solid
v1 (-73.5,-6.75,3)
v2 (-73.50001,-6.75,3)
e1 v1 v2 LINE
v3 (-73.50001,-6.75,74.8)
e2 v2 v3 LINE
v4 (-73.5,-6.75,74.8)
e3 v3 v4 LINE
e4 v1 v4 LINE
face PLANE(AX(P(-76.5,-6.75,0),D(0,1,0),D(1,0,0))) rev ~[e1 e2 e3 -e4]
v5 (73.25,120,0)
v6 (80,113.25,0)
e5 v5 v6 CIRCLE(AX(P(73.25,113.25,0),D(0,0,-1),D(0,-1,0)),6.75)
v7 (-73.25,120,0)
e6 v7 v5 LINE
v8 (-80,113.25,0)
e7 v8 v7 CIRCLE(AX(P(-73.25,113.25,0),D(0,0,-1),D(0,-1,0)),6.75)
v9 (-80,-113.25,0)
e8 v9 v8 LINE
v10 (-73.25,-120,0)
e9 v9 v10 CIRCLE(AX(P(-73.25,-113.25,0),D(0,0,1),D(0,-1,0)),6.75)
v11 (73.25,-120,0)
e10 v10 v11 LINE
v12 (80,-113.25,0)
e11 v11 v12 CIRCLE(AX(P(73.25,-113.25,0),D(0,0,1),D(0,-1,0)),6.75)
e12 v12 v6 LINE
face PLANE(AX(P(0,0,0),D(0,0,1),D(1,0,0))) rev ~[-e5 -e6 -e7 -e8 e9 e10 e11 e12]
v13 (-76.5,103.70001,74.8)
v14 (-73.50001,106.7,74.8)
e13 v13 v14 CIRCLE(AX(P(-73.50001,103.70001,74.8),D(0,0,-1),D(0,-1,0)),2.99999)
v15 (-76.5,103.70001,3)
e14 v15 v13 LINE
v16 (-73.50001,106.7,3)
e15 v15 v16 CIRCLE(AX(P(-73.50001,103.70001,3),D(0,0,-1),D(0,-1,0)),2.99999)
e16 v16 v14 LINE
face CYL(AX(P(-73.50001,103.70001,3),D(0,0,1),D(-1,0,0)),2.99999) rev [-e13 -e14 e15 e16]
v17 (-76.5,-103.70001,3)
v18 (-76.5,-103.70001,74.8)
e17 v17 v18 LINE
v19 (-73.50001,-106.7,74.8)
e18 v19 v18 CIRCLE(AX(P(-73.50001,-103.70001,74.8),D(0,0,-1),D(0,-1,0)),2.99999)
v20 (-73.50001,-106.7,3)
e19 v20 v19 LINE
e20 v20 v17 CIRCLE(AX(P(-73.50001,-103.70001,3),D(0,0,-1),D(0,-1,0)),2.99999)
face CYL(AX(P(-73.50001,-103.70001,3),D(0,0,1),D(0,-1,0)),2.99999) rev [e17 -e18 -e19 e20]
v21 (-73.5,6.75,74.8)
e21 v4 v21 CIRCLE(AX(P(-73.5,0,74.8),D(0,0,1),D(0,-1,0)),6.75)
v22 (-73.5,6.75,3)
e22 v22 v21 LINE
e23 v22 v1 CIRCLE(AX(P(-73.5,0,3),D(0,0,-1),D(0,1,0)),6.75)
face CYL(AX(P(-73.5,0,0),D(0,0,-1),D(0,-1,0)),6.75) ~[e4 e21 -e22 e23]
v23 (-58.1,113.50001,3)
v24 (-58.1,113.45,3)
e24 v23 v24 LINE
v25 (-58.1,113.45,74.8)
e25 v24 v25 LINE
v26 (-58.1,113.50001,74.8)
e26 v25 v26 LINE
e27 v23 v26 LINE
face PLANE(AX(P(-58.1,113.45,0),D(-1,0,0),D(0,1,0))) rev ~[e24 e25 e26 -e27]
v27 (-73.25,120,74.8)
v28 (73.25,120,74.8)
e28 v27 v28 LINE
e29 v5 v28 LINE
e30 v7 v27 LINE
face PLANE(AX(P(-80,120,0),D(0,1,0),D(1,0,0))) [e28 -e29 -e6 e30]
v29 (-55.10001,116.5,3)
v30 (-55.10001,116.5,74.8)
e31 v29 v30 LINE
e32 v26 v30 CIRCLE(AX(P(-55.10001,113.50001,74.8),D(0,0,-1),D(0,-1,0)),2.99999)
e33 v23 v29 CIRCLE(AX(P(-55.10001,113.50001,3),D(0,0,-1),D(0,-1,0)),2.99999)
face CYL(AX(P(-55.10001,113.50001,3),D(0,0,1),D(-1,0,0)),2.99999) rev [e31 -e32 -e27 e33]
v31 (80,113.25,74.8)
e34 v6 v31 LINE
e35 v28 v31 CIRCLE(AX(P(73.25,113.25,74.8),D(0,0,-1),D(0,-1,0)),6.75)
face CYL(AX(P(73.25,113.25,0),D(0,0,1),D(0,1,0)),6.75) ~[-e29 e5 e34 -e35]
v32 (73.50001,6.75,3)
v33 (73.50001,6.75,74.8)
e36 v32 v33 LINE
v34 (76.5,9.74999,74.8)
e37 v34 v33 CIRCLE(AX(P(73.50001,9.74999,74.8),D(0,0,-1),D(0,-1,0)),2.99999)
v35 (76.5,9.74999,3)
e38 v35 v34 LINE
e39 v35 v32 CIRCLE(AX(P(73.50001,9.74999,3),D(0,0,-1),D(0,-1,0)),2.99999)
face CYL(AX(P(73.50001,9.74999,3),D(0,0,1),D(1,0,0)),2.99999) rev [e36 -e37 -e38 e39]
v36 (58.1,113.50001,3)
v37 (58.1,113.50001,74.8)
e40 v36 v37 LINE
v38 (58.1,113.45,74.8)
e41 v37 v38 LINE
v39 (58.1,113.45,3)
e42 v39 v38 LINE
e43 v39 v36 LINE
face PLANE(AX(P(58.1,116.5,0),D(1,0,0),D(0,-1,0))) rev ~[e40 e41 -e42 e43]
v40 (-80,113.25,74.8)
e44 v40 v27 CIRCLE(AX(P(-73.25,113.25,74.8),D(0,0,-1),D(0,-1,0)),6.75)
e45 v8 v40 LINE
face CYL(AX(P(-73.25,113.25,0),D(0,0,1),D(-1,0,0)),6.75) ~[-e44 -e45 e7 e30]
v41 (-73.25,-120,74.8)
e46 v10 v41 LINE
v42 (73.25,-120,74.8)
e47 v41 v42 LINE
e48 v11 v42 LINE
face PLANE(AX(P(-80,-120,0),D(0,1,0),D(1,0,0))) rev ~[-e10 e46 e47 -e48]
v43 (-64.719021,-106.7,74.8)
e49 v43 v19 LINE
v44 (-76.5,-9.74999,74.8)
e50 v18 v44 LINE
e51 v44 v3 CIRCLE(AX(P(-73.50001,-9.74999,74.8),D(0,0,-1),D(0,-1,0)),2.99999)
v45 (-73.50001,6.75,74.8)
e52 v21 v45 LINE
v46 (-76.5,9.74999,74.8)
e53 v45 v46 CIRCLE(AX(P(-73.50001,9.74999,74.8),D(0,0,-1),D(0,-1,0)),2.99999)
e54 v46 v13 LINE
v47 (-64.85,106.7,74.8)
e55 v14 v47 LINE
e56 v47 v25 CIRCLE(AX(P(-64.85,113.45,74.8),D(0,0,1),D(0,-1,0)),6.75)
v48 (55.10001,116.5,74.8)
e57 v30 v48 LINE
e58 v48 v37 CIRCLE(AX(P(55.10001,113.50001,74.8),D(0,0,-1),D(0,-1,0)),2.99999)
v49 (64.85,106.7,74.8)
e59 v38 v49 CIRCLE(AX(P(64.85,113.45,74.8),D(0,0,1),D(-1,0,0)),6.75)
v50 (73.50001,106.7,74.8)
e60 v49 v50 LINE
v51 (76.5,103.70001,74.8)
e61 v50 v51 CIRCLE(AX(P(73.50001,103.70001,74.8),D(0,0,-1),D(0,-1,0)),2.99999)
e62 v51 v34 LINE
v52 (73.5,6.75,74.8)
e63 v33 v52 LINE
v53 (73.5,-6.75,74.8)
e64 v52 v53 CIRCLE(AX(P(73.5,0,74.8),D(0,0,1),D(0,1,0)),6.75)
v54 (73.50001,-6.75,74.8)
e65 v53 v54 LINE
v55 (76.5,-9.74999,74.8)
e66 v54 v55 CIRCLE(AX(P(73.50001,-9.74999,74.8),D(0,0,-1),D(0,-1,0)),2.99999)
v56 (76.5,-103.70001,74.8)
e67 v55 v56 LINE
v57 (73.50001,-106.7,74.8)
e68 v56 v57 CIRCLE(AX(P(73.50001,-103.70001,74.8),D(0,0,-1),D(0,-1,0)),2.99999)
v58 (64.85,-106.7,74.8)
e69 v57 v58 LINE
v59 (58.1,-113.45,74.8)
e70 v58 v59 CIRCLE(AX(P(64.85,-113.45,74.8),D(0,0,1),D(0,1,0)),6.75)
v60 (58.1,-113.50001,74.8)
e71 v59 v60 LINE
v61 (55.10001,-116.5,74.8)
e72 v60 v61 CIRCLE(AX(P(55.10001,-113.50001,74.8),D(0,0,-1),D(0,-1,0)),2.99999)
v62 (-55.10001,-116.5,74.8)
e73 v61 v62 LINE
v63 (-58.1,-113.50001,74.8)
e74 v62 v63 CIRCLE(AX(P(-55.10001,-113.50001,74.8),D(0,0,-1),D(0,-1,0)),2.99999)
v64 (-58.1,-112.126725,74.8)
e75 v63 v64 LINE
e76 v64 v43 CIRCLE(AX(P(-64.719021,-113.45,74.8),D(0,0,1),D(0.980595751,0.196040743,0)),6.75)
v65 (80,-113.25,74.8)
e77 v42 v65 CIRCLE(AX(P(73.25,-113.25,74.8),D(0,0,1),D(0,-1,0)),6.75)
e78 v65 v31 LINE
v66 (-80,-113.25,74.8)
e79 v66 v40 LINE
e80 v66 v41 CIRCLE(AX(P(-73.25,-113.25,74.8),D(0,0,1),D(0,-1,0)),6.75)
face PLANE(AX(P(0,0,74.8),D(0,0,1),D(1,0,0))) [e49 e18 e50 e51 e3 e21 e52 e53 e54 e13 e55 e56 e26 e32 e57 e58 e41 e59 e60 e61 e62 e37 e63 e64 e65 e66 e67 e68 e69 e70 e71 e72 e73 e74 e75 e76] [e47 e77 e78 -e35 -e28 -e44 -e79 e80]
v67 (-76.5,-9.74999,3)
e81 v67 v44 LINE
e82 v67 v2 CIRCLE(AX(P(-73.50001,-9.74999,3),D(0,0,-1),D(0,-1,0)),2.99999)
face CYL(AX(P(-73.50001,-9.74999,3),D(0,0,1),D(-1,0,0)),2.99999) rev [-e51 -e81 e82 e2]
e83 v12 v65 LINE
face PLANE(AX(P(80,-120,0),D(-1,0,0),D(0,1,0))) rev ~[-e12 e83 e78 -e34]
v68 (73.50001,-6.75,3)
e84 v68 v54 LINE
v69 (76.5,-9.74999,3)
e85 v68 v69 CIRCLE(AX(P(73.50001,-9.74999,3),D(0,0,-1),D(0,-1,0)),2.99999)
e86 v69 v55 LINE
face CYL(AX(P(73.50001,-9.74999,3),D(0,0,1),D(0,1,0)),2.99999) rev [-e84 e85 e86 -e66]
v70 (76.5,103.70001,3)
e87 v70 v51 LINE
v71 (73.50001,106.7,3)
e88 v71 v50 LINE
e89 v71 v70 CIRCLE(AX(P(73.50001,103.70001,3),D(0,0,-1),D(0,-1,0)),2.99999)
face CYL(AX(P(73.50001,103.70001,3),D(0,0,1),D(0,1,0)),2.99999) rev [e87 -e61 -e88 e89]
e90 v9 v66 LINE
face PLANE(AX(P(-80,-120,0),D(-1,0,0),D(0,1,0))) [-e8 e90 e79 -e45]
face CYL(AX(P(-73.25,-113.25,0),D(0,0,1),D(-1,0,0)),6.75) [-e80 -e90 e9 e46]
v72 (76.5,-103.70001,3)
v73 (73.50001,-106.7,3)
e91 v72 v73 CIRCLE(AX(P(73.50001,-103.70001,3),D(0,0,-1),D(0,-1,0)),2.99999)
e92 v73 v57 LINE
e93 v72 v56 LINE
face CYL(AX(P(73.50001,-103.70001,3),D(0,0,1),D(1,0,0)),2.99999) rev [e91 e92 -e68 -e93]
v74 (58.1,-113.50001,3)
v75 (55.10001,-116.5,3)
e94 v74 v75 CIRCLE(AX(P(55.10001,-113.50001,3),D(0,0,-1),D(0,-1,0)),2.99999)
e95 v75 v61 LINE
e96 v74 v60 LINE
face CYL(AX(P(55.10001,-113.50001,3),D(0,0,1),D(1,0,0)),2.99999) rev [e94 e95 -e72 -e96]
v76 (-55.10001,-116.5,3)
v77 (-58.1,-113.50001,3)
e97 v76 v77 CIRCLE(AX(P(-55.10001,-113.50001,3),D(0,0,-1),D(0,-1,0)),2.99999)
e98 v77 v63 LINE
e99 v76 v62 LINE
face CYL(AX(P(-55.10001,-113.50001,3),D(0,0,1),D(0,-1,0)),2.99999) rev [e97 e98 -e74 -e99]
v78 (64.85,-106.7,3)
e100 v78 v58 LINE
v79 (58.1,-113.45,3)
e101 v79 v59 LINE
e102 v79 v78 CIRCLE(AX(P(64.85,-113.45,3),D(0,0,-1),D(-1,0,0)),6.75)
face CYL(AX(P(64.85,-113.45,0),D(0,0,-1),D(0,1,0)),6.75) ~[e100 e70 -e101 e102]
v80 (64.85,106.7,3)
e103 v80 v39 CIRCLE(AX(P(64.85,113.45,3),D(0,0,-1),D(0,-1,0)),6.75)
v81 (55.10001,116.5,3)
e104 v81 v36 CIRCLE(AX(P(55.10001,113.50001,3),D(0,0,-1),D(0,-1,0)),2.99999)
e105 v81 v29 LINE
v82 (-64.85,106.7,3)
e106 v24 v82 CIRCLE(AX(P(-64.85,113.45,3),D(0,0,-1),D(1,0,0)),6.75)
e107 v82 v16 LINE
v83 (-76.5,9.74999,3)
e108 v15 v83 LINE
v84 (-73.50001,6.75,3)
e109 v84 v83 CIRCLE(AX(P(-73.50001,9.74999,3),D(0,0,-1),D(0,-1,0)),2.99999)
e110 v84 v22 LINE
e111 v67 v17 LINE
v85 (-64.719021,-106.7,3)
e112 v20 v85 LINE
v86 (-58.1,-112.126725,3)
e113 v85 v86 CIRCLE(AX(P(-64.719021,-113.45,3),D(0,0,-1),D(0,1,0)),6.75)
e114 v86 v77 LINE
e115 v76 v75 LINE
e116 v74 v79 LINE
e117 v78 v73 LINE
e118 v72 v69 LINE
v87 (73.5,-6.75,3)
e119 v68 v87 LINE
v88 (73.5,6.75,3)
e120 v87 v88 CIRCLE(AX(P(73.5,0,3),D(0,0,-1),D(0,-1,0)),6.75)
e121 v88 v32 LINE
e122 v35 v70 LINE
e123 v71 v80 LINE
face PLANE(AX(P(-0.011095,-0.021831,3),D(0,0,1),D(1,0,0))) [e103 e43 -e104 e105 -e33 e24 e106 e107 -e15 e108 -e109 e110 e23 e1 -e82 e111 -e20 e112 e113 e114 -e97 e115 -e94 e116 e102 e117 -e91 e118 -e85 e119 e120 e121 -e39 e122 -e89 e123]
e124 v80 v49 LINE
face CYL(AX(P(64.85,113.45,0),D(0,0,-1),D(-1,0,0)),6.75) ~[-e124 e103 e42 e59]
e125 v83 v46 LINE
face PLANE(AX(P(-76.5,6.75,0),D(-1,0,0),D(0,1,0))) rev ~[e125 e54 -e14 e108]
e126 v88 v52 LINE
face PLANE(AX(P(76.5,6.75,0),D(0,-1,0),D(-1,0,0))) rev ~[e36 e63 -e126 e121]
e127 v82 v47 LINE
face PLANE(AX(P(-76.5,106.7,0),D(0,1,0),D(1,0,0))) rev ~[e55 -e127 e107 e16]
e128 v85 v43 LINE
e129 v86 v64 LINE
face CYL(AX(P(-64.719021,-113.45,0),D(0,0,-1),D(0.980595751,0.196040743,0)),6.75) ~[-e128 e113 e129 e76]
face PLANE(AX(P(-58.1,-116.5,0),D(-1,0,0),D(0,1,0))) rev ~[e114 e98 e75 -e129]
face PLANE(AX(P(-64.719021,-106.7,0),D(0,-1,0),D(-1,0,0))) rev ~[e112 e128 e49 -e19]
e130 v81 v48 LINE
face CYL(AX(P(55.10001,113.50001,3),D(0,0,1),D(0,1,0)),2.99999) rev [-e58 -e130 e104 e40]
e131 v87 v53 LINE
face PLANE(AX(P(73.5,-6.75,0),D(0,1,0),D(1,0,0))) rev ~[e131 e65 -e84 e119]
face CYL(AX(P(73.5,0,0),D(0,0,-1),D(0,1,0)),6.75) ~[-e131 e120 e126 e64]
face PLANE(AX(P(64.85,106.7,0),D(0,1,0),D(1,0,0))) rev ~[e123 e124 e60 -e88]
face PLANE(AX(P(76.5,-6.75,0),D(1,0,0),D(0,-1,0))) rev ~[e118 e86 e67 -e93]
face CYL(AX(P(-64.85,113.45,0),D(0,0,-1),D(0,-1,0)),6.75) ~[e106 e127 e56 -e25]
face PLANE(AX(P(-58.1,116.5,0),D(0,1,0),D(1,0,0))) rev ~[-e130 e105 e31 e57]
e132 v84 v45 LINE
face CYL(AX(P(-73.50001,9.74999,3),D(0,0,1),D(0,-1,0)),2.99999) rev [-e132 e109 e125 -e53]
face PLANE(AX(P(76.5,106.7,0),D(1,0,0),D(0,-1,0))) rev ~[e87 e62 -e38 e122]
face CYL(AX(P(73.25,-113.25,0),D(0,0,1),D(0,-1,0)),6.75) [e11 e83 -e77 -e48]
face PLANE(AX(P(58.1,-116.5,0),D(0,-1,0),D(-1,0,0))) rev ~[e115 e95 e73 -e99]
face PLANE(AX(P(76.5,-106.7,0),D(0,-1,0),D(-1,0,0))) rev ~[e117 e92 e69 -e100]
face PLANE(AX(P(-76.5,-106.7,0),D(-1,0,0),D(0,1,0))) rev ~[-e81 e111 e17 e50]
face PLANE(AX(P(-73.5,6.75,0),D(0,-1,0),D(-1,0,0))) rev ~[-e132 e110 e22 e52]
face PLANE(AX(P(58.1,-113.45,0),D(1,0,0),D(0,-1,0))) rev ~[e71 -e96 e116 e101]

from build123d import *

# Parameters (mm, degrees)
F1_DEPTH = 3
F0_W     = 160
F0_H     = 240
F2_DEPTH = 74.8
F3_R     = 6.75
F4_R     = 2.99999


# Not quite as in the source:
# - a fillet or chamfer is up to 0.001 mm smaller than in the source, because OpenCascade refuses the exact size
# - ends of sketch curves that miss each other by under 0.0002 mm in the source are joined


with BuildPart() as f1:
    # F0 (on Top) → F1 (new body)
    with BuildSketch(Plane.XY):
        with BuildLine():
            Line((58.1, 113.45), (58.1, 116.5))
            Line((58.1, 116.5), (-58.1, 116.5))
            Line((-58.1, 116.5), (-58.1, 113.45))
            ThreePointArc((-58.1, 113.45), (-60.077029227, 108.677029227), (-64.85, 106.7))
            Line((-64.85, 106.7), (-76.5, 106.7))
            Line((-76.5, 106.7), (-76.5, 6.75))
            Line((-76.5, 6.75), (-73.5, 6.75))
            ThreePointArc((-73.5, 6.75), (-66.75, 0), (-73.5, -6.75))
            Line((-73.5, -6.75), (-76.5, -6.75))
            Line((-76.5, -6.75), (-76.5, -106.7))
            Line((-76.5, -106.7), (-64.7190213203, -106.7))
            ThreePointArc((-64.7190213203, -106.7), (-60.4393955388, -108.2301050614), (-58.1, -112.1267249867))
            Line((-58.1, -112.1267249867), (-58.1, -116.5))
            Line((-58.1, -116.5), (58.1, -116.5))
            Line((58.1, -116.5), (58.1, -113.45))
            ThreePointArc((58.1, -113.45), (60.077029227, -108.677029227), (64.85, -106.7))
            Line((64.85, -106.7), (76.5, -106.7))
            Line((76.5, -106.7), (76.5, -6.75))
            Line((76.5, -6.75), (73.5, -6.75))
            ThreePointArc((73.5, -6.75), (66.75, 0), (73.5, 6.75))
            Line((73.5, 6.75), (76.5, 6.75))
            Line((76.5, 6.75), (76.5, 106.7))
            Line((76.5, 106.7), (64.85, 106.7))
            ThreePointArc((64.85, 106.7), (60.077029227, 108.677029227), (58.1, 113.45))
        make_face()
    extrude(amount=F1_DEPTH)

    # F0 (on Top) → F2 (join)
    with BuildSketch(Plane.XY):
        Rectangle(F0_W, F0_H)
        Polygon((58.1, 116.5), (76.5, 116.5), (76.5, 106.7), (76.5, 6.75), (76.5, -6.75), (76.5, -106.7), (76.5, -116.5), (58.1, -116.5), (-58.1, -116.5), (-76.5, -116.5), (-76.5, -106.7), (-76.5, -6.75), (-76.5, 6.75), (-76.5, 106.7), (-76.5, 116.5), (-58.1, 116.5), align=None, mode=Mode.SUBTRACT)
        with BuildLine():
            Line((-58.1, 113.45), (-58.1, 116.5))
            Line((-58.1, 116.5), (-76.5, 116.5))
            Line((-76.5, 116.5), (-76.5, 106.7))
            Line((-76.5, 106.7), (-64.85, 106.7))
            ThreePointArc((-64.85, 106.7), (-60.077029227, 108.677029227), (-58.1, 113.45))
        make_face()
        with BuildLine():
            Line((76.5, 106.7), (76.5, 116.5))
            Line((76.5, 116.5), (58.1, 116.5))
            Line((58.1, 116.5), (58.1, 113.45))
            ThreePointArc((58.1, 113.45), (60.077029227, 108.677029227), (64.85, 106.7))
            Line((64.85, 106.7), (76.5, 106.7))
        make_face()
        with BuildLine():
            Line((-73.5, 6.75), (-76.5, 6.75))
            Line((-76.5, 6.75), (-76.5, -6.75))
            Line((-76.5, -6.75), (-73.5, -6.75))
            ThreePointArc((-73.5, -6.75), (-66.75, 0), (-73.5, 6.75))
        make_face()
        with BuildLine():
            Line((76.5, -6.75), (76.5, 6.75))
            Line((76.5, 6.75), (73.5, 6.75))
            ThreePointArc((73.5, 6.75), (66.75, 0), (73.5, -6.75))
            Line((73.5, -6.75), (76.5, -6.75))
        make_face()
        with BuildLine():
            Line((-64.7190213203, -106.7), (-76.5, -106.7))
            Line((-76.5, -106.7), (-76.5, -116.5))
            Line((-76.5, -116.5), (-58.1, -116.5))
            Line((-58.1, -116.5), (-58.1, -112.1267249867))
            ThreePointArc((-58.1, -112.1267249867), (-60.4393955388, -108.2301050614), (-64.7190213203, -106.7))
        make_face()
        with BuildLine():
            Line((76.5, -116.5), (76.5, -106.7))
            Line((76.5, -106.7), (64.85, -106.7))
            ThreePointArc((64.85, -106.7), (60.077029227, -108.677029227), (58.1, -113.45))
            Line((58.1, -113.45), (58.1, -116.500006485))
            Line((58.1, -116.500006485), (76.5, -116.5))
        make_face()
    extrude(amount=F2_DEPTH)

    # F3
    f3_edges = [f1.edges().sort_by_distance(p)[0] for p in [
        (80, 120, 37.4),
        (-80, 120, 37.4),
        (-80, -120, 37.4),
        (80, -120, 37.4),
    ]]
    fillet(f3_edges, radius=F3_R)

    # F4 (radius 3 in the source; OpenCascade refuses exactly that, so slightly less here)
    f4_edges = [f1.edges().sort_by_distance(p)[0] for p in [
        (-76.5, 106.7, 38.9),
        (-58.1, 116.5, 38.9),
        (-76.5, -6.75, 38.9),
        (58.1, 116.5, 38.9),
        (76.5, 106.7, 38.9),
        (76.5, -6.75, 38.9),
        (-76.5, 6.75, 38.9),
        (-76.5, -106.7, 38.9),
        (-58.1, -116.5, 38.9),
        (76.5, 6.75, 38.9),
        (76.5, -106.7, 38.9),
        (58.1, -116.5, 38.9),
    ]]
    fillet(f4_edges, radius=F4_R)


solid = f1.part
